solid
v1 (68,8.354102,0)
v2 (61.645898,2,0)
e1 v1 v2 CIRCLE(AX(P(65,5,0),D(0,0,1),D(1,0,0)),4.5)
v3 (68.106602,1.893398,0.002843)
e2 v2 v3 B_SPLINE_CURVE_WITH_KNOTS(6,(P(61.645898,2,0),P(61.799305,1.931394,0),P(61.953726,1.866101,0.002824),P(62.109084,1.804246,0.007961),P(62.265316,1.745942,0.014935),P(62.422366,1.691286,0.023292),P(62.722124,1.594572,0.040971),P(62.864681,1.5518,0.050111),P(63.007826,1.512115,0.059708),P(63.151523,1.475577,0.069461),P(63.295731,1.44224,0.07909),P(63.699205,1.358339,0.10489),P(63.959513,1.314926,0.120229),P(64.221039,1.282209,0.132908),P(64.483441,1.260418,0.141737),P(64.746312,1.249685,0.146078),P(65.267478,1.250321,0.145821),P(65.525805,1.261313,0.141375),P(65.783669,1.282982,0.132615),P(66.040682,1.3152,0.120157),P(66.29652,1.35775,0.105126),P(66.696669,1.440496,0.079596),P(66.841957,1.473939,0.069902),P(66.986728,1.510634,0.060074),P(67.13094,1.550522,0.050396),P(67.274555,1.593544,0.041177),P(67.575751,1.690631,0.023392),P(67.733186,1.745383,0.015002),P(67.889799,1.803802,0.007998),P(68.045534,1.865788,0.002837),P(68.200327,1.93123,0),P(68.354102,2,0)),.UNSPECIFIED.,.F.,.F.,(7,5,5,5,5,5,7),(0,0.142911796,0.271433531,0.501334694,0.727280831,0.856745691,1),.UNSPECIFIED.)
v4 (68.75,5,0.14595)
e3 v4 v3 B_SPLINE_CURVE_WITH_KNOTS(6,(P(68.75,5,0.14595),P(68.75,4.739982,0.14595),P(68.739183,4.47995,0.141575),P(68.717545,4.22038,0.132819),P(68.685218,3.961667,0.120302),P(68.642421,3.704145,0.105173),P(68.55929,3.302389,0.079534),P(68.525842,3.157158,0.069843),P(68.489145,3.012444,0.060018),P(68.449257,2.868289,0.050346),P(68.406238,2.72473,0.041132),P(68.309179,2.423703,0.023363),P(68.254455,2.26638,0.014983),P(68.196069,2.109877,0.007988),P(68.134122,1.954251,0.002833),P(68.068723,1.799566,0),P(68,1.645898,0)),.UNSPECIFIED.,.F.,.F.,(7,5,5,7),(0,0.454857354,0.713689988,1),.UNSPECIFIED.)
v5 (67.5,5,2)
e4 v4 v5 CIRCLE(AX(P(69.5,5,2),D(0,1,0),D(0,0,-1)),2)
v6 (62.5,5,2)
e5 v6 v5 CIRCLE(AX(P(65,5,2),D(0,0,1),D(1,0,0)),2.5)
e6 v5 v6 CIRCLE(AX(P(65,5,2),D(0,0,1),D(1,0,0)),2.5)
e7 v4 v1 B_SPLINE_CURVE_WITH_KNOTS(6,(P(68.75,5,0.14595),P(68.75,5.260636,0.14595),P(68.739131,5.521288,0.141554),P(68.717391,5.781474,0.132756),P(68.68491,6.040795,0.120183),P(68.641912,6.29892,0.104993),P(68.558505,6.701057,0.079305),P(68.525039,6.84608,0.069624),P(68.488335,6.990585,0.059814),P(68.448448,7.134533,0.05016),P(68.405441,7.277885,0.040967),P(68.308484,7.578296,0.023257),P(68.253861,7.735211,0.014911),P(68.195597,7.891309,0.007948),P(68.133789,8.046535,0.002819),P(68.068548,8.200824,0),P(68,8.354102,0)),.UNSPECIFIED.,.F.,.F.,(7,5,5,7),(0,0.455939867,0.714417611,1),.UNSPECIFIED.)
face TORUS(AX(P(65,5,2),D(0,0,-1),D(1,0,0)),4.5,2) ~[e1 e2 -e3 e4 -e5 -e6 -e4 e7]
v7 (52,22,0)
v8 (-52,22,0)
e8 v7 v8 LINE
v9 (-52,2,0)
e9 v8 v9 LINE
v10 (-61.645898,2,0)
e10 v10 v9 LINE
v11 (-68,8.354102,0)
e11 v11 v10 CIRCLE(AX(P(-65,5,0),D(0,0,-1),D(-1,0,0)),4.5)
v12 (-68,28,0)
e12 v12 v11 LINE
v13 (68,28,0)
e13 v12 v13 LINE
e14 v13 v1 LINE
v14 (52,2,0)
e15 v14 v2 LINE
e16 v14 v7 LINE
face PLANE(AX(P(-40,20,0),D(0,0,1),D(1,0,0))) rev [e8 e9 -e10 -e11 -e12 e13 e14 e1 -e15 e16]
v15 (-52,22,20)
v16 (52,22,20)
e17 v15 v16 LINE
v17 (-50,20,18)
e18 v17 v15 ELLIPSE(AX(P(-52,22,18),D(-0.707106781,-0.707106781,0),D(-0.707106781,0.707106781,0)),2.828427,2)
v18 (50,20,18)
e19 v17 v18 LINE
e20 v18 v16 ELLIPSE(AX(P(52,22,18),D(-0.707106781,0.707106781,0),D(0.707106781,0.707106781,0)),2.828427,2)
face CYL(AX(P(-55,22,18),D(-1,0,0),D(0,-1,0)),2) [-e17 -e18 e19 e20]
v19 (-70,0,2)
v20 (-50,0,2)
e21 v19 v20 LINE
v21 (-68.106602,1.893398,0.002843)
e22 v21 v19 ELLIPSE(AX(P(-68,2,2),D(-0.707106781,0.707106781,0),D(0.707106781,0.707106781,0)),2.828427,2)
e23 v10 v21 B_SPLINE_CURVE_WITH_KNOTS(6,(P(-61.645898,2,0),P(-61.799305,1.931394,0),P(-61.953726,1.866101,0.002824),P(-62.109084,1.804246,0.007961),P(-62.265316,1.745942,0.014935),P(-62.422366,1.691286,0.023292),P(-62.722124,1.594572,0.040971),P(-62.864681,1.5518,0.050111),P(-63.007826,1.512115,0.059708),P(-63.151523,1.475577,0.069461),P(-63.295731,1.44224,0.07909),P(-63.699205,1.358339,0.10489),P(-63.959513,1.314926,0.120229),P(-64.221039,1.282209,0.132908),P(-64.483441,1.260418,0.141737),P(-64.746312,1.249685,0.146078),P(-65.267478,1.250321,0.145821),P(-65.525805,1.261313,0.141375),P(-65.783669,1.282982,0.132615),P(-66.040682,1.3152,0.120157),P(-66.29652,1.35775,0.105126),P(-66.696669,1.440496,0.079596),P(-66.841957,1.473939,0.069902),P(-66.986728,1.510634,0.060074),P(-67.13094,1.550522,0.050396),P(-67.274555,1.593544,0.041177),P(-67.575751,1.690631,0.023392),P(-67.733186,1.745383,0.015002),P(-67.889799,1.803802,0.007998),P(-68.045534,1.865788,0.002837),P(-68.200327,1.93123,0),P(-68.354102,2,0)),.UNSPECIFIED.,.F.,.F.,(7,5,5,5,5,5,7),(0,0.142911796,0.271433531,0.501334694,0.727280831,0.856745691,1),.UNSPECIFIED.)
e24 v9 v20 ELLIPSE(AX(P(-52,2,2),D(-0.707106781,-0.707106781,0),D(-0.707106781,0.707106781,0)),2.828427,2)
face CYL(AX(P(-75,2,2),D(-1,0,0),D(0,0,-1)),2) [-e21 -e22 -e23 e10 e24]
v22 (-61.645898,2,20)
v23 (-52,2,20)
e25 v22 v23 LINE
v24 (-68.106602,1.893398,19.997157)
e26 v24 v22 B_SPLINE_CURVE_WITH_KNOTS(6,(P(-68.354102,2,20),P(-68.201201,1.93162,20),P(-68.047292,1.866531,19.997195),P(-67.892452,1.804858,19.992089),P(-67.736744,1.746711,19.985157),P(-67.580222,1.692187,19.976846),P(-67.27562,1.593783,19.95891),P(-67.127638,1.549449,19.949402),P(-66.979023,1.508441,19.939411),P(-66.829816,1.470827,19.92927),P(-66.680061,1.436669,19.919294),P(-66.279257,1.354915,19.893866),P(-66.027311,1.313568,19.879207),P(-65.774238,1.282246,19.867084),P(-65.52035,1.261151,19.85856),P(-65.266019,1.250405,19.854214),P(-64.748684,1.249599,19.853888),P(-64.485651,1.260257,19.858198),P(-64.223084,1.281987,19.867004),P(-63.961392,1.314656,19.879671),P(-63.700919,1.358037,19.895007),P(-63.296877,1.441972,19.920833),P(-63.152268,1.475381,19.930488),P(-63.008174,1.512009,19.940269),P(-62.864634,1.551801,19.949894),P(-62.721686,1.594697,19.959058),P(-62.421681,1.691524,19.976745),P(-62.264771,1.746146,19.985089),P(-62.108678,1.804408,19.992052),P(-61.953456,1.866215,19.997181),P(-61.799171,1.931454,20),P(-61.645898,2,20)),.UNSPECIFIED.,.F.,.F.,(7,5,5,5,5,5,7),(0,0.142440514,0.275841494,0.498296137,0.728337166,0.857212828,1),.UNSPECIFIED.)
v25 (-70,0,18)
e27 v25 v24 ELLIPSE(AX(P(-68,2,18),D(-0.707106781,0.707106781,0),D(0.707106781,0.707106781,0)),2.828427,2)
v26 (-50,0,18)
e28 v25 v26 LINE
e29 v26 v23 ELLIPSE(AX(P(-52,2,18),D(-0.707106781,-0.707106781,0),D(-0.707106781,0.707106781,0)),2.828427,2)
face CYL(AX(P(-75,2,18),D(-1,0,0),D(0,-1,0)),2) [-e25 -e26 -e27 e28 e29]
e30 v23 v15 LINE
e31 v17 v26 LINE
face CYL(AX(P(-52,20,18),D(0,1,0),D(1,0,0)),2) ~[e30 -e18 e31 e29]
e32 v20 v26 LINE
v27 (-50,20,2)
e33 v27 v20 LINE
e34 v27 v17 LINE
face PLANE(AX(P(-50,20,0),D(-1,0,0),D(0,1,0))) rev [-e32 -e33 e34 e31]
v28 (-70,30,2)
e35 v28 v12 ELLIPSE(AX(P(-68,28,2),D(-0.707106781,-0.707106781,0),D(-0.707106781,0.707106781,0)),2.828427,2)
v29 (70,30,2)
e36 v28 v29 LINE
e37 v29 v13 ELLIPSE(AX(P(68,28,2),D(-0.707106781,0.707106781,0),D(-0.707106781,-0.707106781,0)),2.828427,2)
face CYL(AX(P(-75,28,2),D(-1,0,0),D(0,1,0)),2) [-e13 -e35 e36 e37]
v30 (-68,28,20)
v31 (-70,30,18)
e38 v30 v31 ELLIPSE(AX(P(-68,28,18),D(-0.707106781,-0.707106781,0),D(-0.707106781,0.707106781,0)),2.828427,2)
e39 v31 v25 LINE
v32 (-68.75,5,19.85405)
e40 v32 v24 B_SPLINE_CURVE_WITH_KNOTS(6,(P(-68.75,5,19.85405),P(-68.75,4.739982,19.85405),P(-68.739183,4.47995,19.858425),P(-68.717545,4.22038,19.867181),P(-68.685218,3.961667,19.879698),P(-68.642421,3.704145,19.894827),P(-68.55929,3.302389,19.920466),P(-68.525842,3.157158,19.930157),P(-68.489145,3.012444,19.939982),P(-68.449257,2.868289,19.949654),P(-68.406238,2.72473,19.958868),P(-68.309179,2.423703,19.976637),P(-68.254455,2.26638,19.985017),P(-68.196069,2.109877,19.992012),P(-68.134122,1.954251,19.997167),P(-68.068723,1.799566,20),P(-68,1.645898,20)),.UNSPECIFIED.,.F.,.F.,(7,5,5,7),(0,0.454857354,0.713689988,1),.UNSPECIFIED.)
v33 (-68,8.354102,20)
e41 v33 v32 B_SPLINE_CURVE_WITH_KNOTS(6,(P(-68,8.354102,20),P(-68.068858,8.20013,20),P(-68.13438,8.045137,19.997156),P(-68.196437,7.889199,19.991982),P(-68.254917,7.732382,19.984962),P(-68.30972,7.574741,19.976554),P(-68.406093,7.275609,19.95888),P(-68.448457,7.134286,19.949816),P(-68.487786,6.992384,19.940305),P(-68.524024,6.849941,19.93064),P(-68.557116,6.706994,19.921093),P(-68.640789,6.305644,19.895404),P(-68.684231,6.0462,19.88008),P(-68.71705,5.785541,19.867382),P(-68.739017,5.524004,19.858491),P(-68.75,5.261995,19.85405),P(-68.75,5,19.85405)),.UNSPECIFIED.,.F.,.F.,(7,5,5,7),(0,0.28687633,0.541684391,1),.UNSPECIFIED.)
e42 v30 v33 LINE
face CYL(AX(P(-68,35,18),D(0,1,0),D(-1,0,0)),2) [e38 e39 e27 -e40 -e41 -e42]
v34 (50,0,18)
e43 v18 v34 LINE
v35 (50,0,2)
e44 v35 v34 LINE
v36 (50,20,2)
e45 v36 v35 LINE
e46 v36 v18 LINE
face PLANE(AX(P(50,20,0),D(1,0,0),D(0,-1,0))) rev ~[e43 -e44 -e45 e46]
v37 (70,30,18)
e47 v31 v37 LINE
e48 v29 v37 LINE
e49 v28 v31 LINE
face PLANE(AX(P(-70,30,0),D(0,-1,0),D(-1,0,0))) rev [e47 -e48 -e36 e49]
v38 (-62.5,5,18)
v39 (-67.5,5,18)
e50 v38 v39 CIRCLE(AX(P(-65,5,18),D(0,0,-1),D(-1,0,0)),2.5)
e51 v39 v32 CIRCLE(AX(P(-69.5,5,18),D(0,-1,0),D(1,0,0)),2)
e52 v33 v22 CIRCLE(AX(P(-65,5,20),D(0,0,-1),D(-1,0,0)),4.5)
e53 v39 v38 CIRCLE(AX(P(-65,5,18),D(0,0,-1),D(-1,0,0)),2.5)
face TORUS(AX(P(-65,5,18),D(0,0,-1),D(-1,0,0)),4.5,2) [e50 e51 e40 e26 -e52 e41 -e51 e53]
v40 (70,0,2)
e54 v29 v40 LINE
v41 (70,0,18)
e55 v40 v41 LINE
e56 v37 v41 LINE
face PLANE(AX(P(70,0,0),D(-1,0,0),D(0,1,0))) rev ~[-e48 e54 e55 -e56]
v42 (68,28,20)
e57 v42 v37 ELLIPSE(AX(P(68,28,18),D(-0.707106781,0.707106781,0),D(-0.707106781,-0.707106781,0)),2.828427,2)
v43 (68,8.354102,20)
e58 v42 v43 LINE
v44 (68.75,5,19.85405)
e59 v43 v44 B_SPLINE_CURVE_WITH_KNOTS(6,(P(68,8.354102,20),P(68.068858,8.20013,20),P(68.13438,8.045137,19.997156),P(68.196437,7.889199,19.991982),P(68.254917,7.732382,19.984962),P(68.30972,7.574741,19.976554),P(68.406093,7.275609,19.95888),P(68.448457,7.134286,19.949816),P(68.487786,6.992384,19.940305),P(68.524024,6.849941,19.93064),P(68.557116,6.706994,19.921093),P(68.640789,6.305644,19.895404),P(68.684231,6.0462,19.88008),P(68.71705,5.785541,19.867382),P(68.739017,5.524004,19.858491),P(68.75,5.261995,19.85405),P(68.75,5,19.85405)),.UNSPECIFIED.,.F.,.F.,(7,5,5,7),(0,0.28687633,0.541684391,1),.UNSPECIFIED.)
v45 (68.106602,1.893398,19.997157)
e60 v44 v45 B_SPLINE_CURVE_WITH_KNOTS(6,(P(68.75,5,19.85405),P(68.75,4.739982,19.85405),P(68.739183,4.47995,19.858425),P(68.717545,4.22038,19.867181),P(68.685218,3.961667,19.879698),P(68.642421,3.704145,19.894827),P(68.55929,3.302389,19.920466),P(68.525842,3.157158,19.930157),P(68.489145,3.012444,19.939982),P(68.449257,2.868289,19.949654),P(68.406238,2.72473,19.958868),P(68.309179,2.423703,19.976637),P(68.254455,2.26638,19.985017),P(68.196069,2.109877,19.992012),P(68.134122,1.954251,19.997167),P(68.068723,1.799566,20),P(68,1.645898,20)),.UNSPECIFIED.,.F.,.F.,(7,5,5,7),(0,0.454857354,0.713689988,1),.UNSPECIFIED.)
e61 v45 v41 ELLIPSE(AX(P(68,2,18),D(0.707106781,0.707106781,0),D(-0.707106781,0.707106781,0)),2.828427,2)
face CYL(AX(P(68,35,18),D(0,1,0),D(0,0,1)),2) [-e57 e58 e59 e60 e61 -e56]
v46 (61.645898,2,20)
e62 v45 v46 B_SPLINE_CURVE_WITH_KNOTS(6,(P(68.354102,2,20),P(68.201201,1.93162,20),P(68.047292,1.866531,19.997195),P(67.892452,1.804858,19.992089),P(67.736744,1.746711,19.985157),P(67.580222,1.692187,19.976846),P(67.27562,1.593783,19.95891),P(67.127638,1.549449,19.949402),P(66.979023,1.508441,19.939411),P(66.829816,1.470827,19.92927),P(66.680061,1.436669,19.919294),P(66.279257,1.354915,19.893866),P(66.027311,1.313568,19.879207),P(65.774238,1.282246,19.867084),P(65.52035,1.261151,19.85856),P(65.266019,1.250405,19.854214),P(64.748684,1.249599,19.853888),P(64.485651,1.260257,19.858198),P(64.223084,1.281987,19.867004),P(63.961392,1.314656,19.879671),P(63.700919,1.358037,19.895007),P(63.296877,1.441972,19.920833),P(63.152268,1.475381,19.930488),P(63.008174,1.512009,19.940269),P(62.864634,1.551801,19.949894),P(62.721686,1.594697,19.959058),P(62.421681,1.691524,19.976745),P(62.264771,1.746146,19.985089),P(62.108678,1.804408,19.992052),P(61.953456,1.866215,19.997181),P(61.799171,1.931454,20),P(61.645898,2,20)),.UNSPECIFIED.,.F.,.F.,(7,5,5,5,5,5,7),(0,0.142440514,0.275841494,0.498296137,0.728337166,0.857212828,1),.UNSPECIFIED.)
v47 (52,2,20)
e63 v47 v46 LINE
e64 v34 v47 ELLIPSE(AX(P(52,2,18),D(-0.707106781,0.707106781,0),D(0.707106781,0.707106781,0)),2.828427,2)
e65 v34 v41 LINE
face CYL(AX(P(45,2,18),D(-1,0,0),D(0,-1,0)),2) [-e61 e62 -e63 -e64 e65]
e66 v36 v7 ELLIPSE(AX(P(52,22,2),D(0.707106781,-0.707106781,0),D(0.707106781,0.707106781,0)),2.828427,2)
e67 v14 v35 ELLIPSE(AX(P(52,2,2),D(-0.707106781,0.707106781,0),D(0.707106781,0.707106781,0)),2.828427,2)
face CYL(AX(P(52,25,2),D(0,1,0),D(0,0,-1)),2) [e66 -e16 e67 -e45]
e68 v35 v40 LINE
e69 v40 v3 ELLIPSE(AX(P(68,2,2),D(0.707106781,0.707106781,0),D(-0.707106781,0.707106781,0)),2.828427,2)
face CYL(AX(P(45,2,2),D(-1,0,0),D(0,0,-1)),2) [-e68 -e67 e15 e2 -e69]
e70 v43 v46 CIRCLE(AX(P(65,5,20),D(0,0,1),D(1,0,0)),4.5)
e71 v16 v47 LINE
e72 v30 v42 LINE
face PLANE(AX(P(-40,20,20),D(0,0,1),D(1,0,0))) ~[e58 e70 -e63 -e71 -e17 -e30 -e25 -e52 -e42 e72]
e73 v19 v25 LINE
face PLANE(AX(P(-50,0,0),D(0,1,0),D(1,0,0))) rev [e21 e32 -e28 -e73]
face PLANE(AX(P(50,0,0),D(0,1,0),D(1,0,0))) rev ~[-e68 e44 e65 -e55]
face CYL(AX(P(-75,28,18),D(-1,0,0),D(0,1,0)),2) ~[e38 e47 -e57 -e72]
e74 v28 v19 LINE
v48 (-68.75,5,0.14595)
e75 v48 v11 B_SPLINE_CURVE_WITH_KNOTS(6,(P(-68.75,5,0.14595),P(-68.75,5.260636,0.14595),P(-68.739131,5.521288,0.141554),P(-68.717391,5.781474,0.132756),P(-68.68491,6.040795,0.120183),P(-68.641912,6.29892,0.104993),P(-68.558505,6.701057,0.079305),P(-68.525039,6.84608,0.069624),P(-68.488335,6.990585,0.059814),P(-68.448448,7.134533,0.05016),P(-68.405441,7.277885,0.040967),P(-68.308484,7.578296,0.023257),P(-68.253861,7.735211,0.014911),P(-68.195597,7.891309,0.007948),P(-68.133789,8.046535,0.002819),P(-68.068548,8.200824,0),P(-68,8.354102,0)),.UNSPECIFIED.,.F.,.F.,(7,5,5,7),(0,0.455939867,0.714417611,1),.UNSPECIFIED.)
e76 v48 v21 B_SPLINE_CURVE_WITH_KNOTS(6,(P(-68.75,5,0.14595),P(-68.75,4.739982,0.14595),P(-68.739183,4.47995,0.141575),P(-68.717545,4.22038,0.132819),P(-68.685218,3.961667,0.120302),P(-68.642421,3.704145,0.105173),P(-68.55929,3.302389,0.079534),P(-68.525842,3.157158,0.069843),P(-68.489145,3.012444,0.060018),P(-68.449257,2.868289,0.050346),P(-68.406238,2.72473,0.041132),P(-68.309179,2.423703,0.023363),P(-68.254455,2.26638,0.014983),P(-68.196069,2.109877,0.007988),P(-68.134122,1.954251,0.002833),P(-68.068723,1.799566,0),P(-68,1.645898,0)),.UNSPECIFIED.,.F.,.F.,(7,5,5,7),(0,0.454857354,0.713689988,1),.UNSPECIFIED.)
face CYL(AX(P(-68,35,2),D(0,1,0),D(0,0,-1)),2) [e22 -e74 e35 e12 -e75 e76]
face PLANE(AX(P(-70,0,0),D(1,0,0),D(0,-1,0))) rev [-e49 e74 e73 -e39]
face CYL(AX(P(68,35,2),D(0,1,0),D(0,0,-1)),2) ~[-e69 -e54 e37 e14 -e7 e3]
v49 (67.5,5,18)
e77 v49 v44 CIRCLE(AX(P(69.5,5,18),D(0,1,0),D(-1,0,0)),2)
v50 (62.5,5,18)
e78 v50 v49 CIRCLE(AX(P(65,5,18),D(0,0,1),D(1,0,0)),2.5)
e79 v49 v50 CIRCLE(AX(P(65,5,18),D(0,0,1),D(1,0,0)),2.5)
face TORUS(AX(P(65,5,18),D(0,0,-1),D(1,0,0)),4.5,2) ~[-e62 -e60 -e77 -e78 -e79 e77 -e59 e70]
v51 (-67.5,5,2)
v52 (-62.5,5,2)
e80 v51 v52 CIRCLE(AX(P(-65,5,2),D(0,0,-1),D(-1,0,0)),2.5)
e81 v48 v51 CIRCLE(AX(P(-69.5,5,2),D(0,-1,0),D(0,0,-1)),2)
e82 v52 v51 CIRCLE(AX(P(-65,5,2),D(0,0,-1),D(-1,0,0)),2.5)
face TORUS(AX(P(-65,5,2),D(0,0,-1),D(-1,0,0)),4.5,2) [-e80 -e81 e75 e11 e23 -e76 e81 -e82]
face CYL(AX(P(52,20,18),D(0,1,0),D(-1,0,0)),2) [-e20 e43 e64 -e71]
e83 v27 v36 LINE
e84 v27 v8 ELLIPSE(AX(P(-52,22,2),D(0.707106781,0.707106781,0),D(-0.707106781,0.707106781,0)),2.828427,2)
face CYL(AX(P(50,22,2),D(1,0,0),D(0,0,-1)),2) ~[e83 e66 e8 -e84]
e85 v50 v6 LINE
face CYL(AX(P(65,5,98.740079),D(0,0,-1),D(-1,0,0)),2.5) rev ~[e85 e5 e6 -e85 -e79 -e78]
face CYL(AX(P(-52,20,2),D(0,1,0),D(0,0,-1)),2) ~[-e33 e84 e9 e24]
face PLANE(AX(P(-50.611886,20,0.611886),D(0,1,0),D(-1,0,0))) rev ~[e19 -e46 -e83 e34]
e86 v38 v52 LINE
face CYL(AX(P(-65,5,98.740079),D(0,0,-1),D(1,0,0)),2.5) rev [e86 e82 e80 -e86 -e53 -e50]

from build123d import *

# Parameters (mm, degrees)
F1_DEPTH     = 20
F3_D         = 5
F5_T1_DEPTH  = 150
F5_T3_DEPTH  = 40
F5_T5_DEPTH  = 30
F5_T7_DEPTH  = 25
F5_T9_DEPTH  = 100
F5_T11_DEPTH = 30
F5_T25_DEPTH = 105
F5_T29_DEPTH = 30
F5_T36_DEPTH = 30
F5_T40_DEPTH = 105
F5_T47_DEPTH = 30
F5_T51_DEPTH = 105
F5_T58_DEPTH = 105
F5_T62_DEPTH = 30


# Not quite as in the source:
# - a fillet or chamfer that OpenCascade refuses, or shapes differently, is made with other operations: its cross-section is extruded or revolved along the edge and cut away or added


with BuildPart() as f1:
    # F0 (on Top) → F1 (new body)
    with BuildSketch(Plane.XY):
        Polygon((70, 30), (0, 30), (0, 20), (50, 20), (50, 0), (70, 0), align=None)
    extrude(amount=F1_DEPTH)

    # F3 (through all)
    with Locations(Plane.XY.offset(20)):
        with Locations((65, 5)):
            Hole(F3_D / 2)

    # F4: F1 across face


with BuildPart() as f1_1:
    add(f1.part)
    add(f1.part.mirror(Plane(origin=(0, 25, 10), x_dir=(0, -1, 0), z_dir=(-1, 0, 0))))

    # F5: fillet of radius 2 on 20 edges, made by hand

    # F5_s2 → F5_t1 (cut)
    with BuildSketch(Plane.YZ.offset(-75)):
        with BuildLine():
            ThreePointArc((30, 18), (29.4142135624, 19.4142135624), (28, 20))
            Line((28, 20), (30, 20))
            Line((30, 20), (30, 18))
        make_face()
        with BuildLine():
            ThreePointArc((30, 2), (29.4142135624, 0.5857864376), (28, 0))
            Line((28, 0), (30, 0))
            Line((30, 0), (30, 2))
        make_face()
    extrude(amount=F5_T1_DEPTH, mode=Mode.SUBTRACT)

    # F5_s4 → F5_t3 (cut)
    with BuildSketch(Plane.XZ.offset(-35)):
        with BuildLine():
            ThreePointArc((-70, 18), (-69.4142135624, 19.4142135624), (-68, 20))
            Line((-68, 20), (-70, 20))
            Line((-70, 20), (-70, 18))
        make_face()
        with BuildLine():
            ThreePointArc((68, 20), (69.4142135624, 19.4142135624), (70, 18))
            Line((70, 18), (70, 20))
            Line((70, 20), (68, 20))
        make_face()
        with BuildLine():
            ThreePointArc((-68, 0), (-69.4142135624, 0.5857864376), (-70, 2))
            Line((-70, 2), (-70, 0))
            Line((-70, 0), (-68, 0))
        make_face()
        with BuildLine():
            ThreePointArc((68, 0), (69.4142135624, 0.5857864376), (70, 2))
            Line((70, 2), (70, 0))
            Line((70, 0), (68, 0))
        make_face()
    extrude(amount=F5_T3_DEPTH, mode=Mode.SUBTRACT)

    # F5_s6 → F5_t5 (cut)
    with BuildSketch(Plane.YZ.offset(-75)):
        with BuildLine():
            ThreePointArc((0, 18), (0.5857864376, 19.4142135624), (2, 20))
            Line((2, 20), (0, 20))
            Line((0, 20), (0, 18))
        make_face()
        with BuildLine():
            ThreePointArc((2, 0), (0.5857864376, 0.5857864376), (0, 2))
            Line((0, 2), (0, 0))
            Line((0, 0), (2, 0))
        make_face()
    extrude(amount=F5_T5_DEPTH, mode=Mode.SUBTRACT)

    # F5_s8 → F5_t7 (cut)
    with BuildSketch(Plane.XZ.offset(-20)):
        with BuildLine():
            ThreePointArc((-50, 18), (-50.5857864376, 19.4142135624), (-52, 20))
            Line((-52, 20), (-50, 20))
            Line((-50, 20), (-50, 18))
        make_face()
        with BuildLine():
            ThreePointArc((50, 18), (50.5857864376, 19.4142135624), (52, 20))
            Line((52, 20), (50, 20))
            Line((50, 20), (50, 18))
        make_face()
        with BuildLine():
            ThreePointArc((-52, 0), (-50.5857864376, 0.5857864376), (-50, 2))
            Line((-50, 2), (-50, 0))
            Line((-50, 0), (-52, 0))
        make_face()
        with BuildLine():
            ThreePointArc((52, 0), (50.5857864376, 0.5857864376), (50, 2))
            Line((50, 2), (50, 0))
            Line((50, 0), (52, 0))
        make_face()
    extrude(amount=F5_T7_DEPTH, mode=Mode.SUBTRACT)

    # F5_s10 → F5_t9 (cut)
    with BuildSketch(Plane.YZ.offset(-50)):
        with BuildLine():
            ThreePointArc((20, 18), (20.5857864376, 19.4142135624), (22, 20))
            Line((22, 20), (20, 20))
            Line((20, 20), (20, 18))
        make_face()
        with BuildLine():
            ThreePointArc((22, 0), (20.5857864376, 0.5857864376), (20, 2))
            Line((20, 2), (20, 0))
            Line((20, 0), (22, 0))
        make_face()
    extrude(amount=F5_T9_DEPTH, mode=Mode.SUBTRACT)

    # F5_s12 → F5_t11 (cut)
    with BuildSketch(Plane.YZ.offset(45)):
        with BuildLine():
            ThreePointArc((0, 18), (0.5857864376, 19.4142135624), (2, 20))
            Line((2, 20), (0, 20))
            Line((0, 20), (0, 18))
        make_face()
        with BuildLine():
            ThreePointArc((2, 0), (0.5857864376, 0.5857864376), (0, 2))
            Line((0, 2), (0, 0))
            Line((0, 0), (2, 0))
        make_face()
    extrude(amount=F5_T11_DEPTH, mode=Mode.SUBTRACT)

    # F5_s13 → F5_t14 (revolve, cut)
    with BuildSketch(Plane.XZ.offset(-5)):
        with BuildLine():
            ThreePointArc((67.5, 18), (68.0857864376, 19.4142135624), (69.5, 20))
            Line((69.5, 20), (67.5, 20))
            Line((67.5, 20), (67.5, 18))
        make_face()
    revolve(axis=Axis((65, 5, 20), (0, 0, 1)), mode=Mode.SUBTRACT)

    # F5_s15 → F5_t16 (revolve, cut)
    with BuildSketch(Plane.XZ.offset(-5)):
        with BuildLine():
            ThreePointArc((-67.5, 18), (-68.0857864376, 19.4142135624), (-69.5, 20))
            Line((-69.5, 20), (-67.5, 20))
            Line((-67.5, 20), (-67.5, 18))
        make_face()
    revolve(axis=Axis((-65, 5, 20), (0, 0, -1)), mode=Mode.SUBTRACT)

    # F5_s17 → F5_t18 (revolve, cut)
    with BuildSketch(Plane.XZ.offset(-5)):
        with BuildLine():
            ThreePointArc((69.5, 0), (68.0857864376, 0.5857864376), (67.5, 2))
            Line((67.5, 2), (67.5, 0))
            Line((67.5, 0), (69.5, 0))
        make_face()
    revolve(axis=Axis((65, 5, 0), (0, 0, 1)), mode=Mode.SUBTRACT)

    # F5_s19 → F5_t20 (revolve, cut)
    with BuildSketch(Plane.XZ.offset(-5)):
        with BuildLine():
            ThreePointArc((-69.5, 0), (-68.0857864376, 0.5857864376), (-67.5, 2))
            Line((-67.5, 2), (-67.5, 0))
            Line((-67.5, 0), (-69.5, 0))
        make_face()
    revolve(axis=Axis((-65, 5, 0), (0, 0, -1)), mode=Mode.SUBTRACT)


with BuildPart() as f5_tool23:
    # F5_s24 → F5_t25 (new body)
    with BuildSketch(Plane.YZ.offset(-55)):
        with BuildLine():
            ThreePointArc((20, 18), (20.5857864376, 19.4142135624), (22, 20))
            Line((22, 20), (20, 20))
            Line((20, 20), (20, 18))
        make_face()
    extrude(amount=F5_T25_DEPTH)

    split(bisect_by=Plane.YZ.offset(-50), keep=Keep.BOTTOM)


with BuildPart() as f5_tool27:
    # F5_s28 → F5_t29 (new body)
    with BuildSketch(Plane.XZ.offset(-25)):
        with BuildLine():
            ThreePointArc((-50, 18), (-50.5857864376, 19.4142135624), (-52, 20))
            Line((-52, 20), (-50, 20))
            Line((-50, 20), (-50, 18))
        make_face()
    extrude(amount=F5_T29_DEPTH)

    split(bisect_by=Plane.XZ.offset(-20), keep=Keep.BOTTOM)


with BuildPart() as f5_tool23_1:
    add(f5_tool23.part)

    # F5_t31: intersect F5_tool27
    add(f5_tool27.part, mode=Mode.INTERSECT)


with BuildPart() as f1_2:
    add(f1_1.part)

    # F5_t21: cut F5_tool23
    add(f5_tool23_1.part, mode=Mode.SUBTRACT)


with BuildPart() as f5_tool34:
    # F5_s35 → F5_t36 (new body)
    with BuildSketch(Plane.XZ.offset(-25)):
        with BuildLine():
            ThreePointArc((50, 18), (50.5857864376, 19.4142135624), (52, 20))
            Line((52, 20), (50, 20))
            Line((50, 20), (50, 18))
        make_face()
    extrude(amount=F5_T36_DEPTH)

    split(bisect_by=Plane.XZ.offset(-20), keep=Keep.BOTTOM)


with BuildPart() as f5_tool38:
    # F5_s39 → F5_t40 (new body)
    with BuildSketch(Plane.YZ.offset(-50)):
        with BuildLine():
            ThreePointArc((20, 18), (20.5857864376, 19.4142135624), (22, 20))
            Line((22, 20), (20, 20))
            Line((20, 20), (20, 18))
        make_face()
    extrude(amount=F5_T40_DEPTH)

    split(bisect_by=Plane.YZ.offset(50), keep=Keep.TOP)


with BuildPart() as f5_tool34_1:
    add(f5_tool34.part)

    # F5_t42: intersect F5_tool38
    add(f5_tool38.part, mode=Mode.INTERSECT)


with BuildPart() as f1_3:
    add(f1_2.part)

    # F5_t32: cut F5_tool34
    add(f5_tool34_1.part, mode=Mode.SUBTRACT)


with BuildPart() as f5_tool45:
    # F5_s46 → F5_t47 (new body)
    with BuildSketch(Plane.XZ.offset(-25)):
        with BuildLine():
            ThreePointArc((-52, 0), (-50.5857864376, 0.5857864376), (-50, 2))
            Line((-50, 2), (-50, 0))
            Line((-50, 0), (-52, 0))
        make_face()
    extrude(amount=F5_T47_DEPTH)

    split(bisect_by=Plane.XZ.offset(-20), keep=Keep.BOTTOM)


with BuildPart() as f5_tool49:
    # F5_s50 → F5_t51 (new body)
    with BuildSketch(Plane.YZ.offset(50)):
        with BuildLine():
            ThreePointArc((22, 0), (20.5857864376, 0.5857864376), (20, 2))
            Line((20, 2), (20, 0))
            Line((20, 0), (22, 0))
        make_face()
    extrude(amount=-F5_T51_DEPTH)

    split(bisect_by=Plane.YZ.offset(-50), keep=Keep.BOTTOM)


with BuildPart() as f5_tool45_1:
    add(f5_tool45.part)

    # F5_t53: intersect F5_tool49
    add(f5_tool49.part, mode=Mode.INTERSECT)


with BuildPart() as f1_4:
    add(f1_3.part)

    # F5_t43: cut F5_tool45
    add(f5_tool45_1.part, mode=Mode.SUBTRACT)


with BuildPart() as f5_tool56:
    # F5_s57 → F5_t58 (new body)
    with BuildSketch(Plane.YZ.offset(55)):
        with BuildLine():
            ThreePointArc((22, 0), (20.5857864376, 0.5857864376), (20, 2))
            Line((20, 2), (20, 0))
            Line((20, 0), (22, 0))
        make_face()
    extrude(amount=-F5_T58_DEPTH)

    split(bisect_by=Plane.YZ.offset(50), keep=Keep.TOP)


with BuildPart() as f5_tool60:
    # F5_s61 → F5_t62 (new body)
    with BuildSketch(Plane.XZ.offset(-25)):
        with BuildLine():
            ThreePointArc((52, 0), (50.5857864376, 0.5857864376), (50, 2))
            Line((50, 2), (50, 0))
            Line((50, 0), (52, 0))
        make_face()
    extrude(amount=F5_T62_DEPTH)

    split(bisect_by=Plane.XZ.offset(-20), keep=Keep.BOTTOM)


with BuildPart() as f5_tool56_1:
    add(f5_tool56.part)

    # F5_t64: intersect F5_tool60
    add(f5_tool60.part, mode=Mode.INTERSECT)


with BuildPart() as f1_5:
    add(f1_4.part)

    # F5_t54: cut F5_tool56
    add(f5_tool56_1.part, mode=Mode.SUBTRACT)


solid = f1_5.part
